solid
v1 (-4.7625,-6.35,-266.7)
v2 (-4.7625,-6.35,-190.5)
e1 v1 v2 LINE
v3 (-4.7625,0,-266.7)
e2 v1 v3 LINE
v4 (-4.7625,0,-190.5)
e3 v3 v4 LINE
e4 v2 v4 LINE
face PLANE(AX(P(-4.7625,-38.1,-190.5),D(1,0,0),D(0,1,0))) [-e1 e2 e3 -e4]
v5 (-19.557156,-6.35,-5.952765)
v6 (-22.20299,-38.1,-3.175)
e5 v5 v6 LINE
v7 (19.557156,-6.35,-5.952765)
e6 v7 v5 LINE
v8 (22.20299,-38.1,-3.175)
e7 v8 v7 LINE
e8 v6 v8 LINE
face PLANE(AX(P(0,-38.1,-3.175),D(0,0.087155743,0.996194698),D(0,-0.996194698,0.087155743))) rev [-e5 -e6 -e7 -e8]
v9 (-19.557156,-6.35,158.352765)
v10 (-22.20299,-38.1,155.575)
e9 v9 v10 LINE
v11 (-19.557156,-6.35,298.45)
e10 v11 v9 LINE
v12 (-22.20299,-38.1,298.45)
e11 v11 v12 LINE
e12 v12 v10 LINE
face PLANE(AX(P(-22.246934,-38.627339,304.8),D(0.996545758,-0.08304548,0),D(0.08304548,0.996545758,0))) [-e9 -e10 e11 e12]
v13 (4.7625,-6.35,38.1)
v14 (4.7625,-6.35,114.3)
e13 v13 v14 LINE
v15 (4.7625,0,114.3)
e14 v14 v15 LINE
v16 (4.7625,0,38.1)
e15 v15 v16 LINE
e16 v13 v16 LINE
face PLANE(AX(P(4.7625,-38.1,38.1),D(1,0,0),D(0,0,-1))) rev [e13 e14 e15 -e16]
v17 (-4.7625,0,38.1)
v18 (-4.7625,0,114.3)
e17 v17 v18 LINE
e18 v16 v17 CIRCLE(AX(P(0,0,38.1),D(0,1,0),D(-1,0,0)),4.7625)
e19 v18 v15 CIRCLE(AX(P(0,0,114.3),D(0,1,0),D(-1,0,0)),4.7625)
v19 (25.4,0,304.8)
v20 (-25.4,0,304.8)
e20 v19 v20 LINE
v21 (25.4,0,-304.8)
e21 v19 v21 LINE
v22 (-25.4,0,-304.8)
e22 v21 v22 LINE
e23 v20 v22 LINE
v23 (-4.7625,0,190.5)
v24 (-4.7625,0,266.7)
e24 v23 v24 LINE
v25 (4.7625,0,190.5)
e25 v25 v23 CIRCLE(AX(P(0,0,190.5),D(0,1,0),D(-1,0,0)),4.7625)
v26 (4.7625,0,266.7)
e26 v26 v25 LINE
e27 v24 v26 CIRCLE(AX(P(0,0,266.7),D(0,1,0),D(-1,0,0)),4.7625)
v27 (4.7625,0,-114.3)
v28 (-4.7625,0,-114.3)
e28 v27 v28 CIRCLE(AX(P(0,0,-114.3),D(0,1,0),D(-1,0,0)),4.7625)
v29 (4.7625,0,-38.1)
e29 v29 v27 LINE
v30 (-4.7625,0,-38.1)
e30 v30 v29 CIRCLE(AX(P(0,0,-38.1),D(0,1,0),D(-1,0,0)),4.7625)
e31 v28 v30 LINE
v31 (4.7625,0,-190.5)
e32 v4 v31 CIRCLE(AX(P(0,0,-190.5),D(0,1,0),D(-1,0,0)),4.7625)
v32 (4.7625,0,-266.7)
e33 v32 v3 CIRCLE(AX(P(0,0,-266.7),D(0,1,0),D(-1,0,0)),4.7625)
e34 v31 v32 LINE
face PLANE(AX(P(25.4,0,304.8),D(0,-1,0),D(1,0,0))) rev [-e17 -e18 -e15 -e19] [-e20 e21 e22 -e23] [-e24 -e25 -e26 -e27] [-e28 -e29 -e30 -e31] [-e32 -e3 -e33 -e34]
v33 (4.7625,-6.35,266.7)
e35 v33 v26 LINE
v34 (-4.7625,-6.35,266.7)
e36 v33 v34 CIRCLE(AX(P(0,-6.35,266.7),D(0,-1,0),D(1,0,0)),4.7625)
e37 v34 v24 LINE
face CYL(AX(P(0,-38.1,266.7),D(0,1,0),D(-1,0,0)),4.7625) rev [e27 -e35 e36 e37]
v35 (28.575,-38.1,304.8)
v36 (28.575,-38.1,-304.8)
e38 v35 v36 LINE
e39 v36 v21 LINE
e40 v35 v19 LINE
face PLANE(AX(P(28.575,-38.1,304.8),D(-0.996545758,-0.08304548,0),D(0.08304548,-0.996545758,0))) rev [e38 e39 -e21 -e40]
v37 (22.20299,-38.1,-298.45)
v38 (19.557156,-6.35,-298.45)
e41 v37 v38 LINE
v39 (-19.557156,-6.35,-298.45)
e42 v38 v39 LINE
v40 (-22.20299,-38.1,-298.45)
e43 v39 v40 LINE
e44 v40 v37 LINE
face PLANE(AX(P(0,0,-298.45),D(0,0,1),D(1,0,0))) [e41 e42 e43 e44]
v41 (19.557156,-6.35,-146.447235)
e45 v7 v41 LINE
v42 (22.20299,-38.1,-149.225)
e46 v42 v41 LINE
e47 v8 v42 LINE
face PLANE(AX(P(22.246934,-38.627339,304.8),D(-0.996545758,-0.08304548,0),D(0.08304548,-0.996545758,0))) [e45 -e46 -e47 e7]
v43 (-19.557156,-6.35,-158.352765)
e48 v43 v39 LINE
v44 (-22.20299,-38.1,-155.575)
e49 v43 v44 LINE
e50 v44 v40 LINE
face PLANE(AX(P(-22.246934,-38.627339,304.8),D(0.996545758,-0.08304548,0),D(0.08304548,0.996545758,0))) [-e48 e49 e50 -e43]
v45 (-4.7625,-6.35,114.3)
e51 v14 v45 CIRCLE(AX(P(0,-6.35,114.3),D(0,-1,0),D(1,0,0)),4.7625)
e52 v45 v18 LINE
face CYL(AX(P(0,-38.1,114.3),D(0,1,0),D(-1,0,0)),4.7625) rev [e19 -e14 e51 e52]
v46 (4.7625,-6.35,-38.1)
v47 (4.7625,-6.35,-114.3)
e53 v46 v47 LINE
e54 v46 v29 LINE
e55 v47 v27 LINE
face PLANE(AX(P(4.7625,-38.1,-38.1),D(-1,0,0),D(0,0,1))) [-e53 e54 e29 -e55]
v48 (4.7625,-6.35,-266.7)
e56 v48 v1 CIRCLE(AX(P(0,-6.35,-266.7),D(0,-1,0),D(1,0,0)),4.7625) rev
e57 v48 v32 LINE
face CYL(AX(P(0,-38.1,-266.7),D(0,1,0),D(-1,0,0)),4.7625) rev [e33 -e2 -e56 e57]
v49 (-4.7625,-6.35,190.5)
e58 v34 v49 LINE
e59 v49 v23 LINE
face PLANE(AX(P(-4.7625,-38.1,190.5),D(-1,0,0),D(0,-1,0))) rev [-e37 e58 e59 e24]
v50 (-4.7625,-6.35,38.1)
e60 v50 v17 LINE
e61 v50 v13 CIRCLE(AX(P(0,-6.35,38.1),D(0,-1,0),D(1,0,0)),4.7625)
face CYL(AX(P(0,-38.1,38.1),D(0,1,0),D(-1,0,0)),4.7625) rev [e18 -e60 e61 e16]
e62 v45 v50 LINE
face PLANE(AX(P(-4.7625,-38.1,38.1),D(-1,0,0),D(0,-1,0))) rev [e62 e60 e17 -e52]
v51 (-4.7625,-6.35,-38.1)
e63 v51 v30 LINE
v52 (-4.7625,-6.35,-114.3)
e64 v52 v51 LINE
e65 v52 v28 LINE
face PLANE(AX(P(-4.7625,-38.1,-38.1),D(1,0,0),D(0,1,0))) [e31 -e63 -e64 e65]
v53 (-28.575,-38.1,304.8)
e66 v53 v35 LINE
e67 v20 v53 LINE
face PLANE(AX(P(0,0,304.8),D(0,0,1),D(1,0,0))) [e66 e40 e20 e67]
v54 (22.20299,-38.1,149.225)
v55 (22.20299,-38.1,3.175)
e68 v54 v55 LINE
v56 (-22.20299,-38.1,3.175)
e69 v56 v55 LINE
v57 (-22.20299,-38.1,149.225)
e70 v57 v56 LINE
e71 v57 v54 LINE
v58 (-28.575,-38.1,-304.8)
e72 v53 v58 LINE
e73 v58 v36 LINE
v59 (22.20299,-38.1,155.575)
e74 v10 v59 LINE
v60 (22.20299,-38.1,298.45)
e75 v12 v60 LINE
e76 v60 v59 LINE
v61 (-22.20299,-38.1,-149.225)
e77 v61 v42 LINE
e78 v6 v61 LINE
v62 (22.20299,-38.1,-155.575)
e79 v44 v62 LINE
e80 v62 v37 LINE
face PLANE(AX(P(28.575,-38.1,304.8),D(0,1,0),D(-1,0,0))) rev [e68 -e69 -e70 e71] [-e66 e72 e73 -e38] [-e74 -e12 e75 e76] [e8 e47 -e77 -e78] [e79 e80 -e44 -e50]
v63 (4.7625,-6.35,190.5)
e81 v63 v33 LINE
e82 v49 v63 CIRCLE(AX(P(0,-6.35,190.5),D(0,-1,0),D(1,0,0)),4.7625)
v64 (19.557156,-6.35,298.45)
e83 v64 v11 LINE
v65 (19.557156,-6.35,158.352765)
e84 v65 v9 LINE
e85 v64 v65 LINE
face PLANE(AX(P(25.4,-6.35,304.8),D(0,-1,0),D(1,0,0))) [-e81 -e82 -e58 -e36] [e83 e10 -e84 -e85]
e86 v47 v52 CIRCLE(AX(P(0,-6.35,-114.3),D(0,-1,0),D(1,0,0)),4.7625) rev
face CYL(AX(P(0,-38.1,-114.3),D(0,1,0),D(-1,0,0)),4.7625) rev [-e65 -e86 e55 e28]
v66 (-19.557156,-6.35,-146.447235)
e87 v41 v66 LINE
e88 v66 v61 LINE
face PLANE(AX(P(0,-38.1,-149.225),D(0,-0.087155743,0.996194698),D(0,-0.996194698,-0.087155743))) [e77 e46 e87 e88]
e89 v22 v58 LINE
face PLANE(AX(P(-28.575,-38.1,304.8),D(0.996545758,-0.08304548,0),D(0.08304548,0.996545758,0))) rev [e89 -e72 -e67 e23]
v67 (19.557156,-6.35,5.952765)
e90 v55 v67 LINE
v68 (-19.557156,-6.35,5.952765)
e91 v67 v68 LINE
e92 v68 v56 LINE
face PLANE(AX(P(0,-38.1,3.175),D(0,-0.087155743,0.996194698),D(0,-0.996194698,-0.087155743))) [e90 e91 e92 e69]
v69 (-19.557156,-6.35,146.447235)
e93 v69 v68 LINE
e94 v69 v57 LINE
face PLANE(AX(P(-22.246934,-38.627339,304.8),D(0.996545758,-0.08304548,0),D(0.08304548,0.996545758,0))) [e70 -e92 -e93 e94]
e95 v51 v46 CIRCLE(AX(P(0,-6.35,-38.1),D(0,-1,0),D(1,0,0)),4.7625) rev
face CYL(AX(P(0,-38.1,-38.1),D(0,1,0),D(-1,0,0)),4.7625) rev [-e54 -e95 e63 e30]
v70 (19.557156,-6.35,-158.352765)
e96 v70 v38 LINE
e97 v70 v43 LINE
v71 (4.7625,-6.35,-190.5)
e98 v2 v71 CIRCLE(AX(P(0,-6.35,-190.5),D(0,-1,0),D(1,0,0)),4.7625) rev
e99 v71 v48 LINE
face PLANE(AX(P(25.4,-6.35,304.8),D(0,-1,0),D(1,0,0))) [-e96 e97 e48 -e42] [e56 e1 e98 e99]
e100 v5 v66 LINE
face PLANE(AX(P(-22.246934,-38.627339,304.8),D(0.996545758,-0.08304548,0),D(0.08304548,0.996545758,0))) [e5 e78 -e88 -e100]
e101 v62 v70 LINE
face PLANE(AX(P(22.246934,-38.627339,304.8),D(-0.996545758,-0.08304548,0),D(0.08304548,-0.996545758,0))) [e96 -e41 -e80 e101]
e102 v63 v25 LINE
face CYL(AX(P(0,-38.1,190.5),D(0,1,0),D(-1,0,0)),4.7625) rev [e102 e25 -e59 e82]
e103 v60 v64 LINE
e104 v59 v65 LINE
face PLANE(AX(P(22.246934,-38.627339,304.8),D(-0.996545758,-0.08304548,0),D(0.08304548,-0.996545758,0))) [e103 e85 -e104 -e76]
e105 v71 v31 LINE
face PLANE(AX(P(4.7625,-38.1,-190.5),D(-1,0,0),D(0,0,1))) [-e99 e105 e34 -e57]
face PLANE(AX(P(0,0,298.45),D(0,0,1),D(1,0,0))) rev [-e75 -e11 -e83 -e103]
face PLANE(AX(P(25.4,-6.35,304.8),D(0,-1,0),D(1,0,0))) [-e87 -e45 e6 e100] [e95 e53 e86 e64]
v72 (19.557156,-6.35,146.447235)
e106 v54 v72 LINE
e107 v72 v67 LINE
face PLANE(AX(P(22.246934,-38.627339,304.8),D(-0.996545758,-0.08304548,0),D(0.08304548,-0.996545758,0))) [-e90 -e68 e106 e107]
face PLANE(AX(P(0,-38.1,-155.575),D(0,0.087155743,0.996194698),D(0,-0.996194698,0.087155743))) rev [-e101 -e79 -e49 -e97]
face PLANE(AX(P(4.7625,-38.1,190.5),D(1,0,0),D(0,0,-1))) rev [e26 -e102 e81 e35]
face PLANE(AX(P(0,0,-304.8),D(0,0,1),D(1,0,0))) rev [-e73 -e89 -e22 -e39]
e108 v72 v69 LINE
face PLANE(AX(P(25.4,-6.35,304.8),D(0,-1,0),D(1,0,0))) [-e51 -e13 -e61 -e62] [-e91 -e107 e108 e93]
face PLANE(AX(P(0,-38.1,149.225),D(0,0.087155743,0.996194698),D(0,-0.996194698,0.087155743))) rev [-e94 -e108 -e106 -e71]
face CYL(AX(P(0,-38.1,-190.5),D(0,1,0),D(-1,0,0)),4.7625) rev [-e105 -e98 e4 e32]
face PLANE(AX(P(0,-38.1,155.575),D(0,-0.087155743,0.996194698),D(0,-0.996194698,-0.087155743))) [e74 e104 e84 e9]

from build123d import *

# Parameters (mm, degrees)
BOSS_EXTRUDE1_DEPTH  = 304.8
SHELL1_T             = -6.35
CUT_EXTRUDE1_DEPTH   = 309.49826681
RIB2_START           = -22.202989535
RIB2_DEPTH           = 44.40597907
LPATTERN1_COUNT      = 3
LPATTERN1_PITCH      = 152.4
LPATTERN2_COUNT      = 2
LPATTERN2_PITCH      = 152.4
MIRROR1_COPY_1_DEPTH = 309.49826681


# Read off the part's stored shape, not the designer's step: Rib2
with BuildPart() as part:
    # Sketch1 → Boss-Extrude1 (new, symmetric)
    with BuildSketch(Plane.XY):
        Polygon((28.575, -38.1), (-28.575, -38.1), (-25.4, 0), (25.4, 0), align=None)
    extrude(amount=BOSS_EXTRUDE1_DEPTH, both=True)

    # Shell1
    shell1_openings = [part.faces().sort_by_distance(p)[0] for p in [
        (0, -38.1, 0),
    ]]
    offset(amount=SHELL1_T, openings=shell1_openings, kind=Kind.INTERSECTION)

    # Sketch2 → Cut-Extrude1 (cut, symmetric)
    with BuildSketch(Plane(origin=(0, 0, 0), x_dir=(1, 0, 0), z_dir=(0, 1, 0))):
        with BuildLine():
            Line((4.7625, -38.1), (4.7625, -114.3))
            ThreePointArc((4.7625, -114.3), (0, -119.0625), (-4.7625, -114.3))
            Line((-4.7625, -114.3), (-4.7625, -38.1))
            ThreePointArc((-4.7625, -38.1), (0, -33.3375), (4.7625, -38.1))
        make_face()
    cut_extrude1 = extrude(amount=CUT_EXTRUDE1_DEPTH, both=True, mode=Mode.SUBTRACT)

    # Rib2 outline → Rib2 (add)
    with BuildSketch(Plane.YZ.offset(RIB2_START)):
        Polygon((-6.35, 146.447234933), (-6.35, 158.352765067), (-38.1, 155.575), (-38.1, 149.225), align=None)
    rib2 = extrude(amount=RIB2_DEPTH)

    # LPattern1: Rib2 ×3
    with Locations(*[(0, 0, -i * LPATTERN1_PITCH) for i in range(1, LPATTERN1_COUNT)]):
        add(rib2)

    # LPattern2: Cut-Extrude1 ×2
    with Locations(*[(0, 0, i * LPATTERN2_PITCH) for i in range(1, LPATTERN2_COUNT)]):
        add(cut_extrude1, mode=Mode.SUBTRACT)

    # Mirror1: Cut-Extrude1 across plane
    add(cut_extrude1.mirror(Plane.XY), mode=Mode.SUBTRACT)

    # Mirror1 copy 1 sketch → Mirror1 copy 1 (cut, symmetric)
    with BuildSketch(Plane(origin=(0, 0, -152.4), x_dir=(1, 0, 0), z_dir=(0, 1, 0))):
        with BuildLine():
            Line((4.7625, 38.1), (4.7625, 114.3))
            ThreePointArc((4.7625, 114.3), (0, 119.0625), (-4.7625, 114.3))
            Line((-4.7625, 114.3), (-4.7625, 38.1))
            ThreePointArc((-4.7625, 38.1), (0, 33.3375), (4.7625, 38.1))
        make_face()
    extrude(amount=MIRROR1_COPY_1_DEPTH, both=True, mode=Mode.SUBTRACT)


solid = part.part
